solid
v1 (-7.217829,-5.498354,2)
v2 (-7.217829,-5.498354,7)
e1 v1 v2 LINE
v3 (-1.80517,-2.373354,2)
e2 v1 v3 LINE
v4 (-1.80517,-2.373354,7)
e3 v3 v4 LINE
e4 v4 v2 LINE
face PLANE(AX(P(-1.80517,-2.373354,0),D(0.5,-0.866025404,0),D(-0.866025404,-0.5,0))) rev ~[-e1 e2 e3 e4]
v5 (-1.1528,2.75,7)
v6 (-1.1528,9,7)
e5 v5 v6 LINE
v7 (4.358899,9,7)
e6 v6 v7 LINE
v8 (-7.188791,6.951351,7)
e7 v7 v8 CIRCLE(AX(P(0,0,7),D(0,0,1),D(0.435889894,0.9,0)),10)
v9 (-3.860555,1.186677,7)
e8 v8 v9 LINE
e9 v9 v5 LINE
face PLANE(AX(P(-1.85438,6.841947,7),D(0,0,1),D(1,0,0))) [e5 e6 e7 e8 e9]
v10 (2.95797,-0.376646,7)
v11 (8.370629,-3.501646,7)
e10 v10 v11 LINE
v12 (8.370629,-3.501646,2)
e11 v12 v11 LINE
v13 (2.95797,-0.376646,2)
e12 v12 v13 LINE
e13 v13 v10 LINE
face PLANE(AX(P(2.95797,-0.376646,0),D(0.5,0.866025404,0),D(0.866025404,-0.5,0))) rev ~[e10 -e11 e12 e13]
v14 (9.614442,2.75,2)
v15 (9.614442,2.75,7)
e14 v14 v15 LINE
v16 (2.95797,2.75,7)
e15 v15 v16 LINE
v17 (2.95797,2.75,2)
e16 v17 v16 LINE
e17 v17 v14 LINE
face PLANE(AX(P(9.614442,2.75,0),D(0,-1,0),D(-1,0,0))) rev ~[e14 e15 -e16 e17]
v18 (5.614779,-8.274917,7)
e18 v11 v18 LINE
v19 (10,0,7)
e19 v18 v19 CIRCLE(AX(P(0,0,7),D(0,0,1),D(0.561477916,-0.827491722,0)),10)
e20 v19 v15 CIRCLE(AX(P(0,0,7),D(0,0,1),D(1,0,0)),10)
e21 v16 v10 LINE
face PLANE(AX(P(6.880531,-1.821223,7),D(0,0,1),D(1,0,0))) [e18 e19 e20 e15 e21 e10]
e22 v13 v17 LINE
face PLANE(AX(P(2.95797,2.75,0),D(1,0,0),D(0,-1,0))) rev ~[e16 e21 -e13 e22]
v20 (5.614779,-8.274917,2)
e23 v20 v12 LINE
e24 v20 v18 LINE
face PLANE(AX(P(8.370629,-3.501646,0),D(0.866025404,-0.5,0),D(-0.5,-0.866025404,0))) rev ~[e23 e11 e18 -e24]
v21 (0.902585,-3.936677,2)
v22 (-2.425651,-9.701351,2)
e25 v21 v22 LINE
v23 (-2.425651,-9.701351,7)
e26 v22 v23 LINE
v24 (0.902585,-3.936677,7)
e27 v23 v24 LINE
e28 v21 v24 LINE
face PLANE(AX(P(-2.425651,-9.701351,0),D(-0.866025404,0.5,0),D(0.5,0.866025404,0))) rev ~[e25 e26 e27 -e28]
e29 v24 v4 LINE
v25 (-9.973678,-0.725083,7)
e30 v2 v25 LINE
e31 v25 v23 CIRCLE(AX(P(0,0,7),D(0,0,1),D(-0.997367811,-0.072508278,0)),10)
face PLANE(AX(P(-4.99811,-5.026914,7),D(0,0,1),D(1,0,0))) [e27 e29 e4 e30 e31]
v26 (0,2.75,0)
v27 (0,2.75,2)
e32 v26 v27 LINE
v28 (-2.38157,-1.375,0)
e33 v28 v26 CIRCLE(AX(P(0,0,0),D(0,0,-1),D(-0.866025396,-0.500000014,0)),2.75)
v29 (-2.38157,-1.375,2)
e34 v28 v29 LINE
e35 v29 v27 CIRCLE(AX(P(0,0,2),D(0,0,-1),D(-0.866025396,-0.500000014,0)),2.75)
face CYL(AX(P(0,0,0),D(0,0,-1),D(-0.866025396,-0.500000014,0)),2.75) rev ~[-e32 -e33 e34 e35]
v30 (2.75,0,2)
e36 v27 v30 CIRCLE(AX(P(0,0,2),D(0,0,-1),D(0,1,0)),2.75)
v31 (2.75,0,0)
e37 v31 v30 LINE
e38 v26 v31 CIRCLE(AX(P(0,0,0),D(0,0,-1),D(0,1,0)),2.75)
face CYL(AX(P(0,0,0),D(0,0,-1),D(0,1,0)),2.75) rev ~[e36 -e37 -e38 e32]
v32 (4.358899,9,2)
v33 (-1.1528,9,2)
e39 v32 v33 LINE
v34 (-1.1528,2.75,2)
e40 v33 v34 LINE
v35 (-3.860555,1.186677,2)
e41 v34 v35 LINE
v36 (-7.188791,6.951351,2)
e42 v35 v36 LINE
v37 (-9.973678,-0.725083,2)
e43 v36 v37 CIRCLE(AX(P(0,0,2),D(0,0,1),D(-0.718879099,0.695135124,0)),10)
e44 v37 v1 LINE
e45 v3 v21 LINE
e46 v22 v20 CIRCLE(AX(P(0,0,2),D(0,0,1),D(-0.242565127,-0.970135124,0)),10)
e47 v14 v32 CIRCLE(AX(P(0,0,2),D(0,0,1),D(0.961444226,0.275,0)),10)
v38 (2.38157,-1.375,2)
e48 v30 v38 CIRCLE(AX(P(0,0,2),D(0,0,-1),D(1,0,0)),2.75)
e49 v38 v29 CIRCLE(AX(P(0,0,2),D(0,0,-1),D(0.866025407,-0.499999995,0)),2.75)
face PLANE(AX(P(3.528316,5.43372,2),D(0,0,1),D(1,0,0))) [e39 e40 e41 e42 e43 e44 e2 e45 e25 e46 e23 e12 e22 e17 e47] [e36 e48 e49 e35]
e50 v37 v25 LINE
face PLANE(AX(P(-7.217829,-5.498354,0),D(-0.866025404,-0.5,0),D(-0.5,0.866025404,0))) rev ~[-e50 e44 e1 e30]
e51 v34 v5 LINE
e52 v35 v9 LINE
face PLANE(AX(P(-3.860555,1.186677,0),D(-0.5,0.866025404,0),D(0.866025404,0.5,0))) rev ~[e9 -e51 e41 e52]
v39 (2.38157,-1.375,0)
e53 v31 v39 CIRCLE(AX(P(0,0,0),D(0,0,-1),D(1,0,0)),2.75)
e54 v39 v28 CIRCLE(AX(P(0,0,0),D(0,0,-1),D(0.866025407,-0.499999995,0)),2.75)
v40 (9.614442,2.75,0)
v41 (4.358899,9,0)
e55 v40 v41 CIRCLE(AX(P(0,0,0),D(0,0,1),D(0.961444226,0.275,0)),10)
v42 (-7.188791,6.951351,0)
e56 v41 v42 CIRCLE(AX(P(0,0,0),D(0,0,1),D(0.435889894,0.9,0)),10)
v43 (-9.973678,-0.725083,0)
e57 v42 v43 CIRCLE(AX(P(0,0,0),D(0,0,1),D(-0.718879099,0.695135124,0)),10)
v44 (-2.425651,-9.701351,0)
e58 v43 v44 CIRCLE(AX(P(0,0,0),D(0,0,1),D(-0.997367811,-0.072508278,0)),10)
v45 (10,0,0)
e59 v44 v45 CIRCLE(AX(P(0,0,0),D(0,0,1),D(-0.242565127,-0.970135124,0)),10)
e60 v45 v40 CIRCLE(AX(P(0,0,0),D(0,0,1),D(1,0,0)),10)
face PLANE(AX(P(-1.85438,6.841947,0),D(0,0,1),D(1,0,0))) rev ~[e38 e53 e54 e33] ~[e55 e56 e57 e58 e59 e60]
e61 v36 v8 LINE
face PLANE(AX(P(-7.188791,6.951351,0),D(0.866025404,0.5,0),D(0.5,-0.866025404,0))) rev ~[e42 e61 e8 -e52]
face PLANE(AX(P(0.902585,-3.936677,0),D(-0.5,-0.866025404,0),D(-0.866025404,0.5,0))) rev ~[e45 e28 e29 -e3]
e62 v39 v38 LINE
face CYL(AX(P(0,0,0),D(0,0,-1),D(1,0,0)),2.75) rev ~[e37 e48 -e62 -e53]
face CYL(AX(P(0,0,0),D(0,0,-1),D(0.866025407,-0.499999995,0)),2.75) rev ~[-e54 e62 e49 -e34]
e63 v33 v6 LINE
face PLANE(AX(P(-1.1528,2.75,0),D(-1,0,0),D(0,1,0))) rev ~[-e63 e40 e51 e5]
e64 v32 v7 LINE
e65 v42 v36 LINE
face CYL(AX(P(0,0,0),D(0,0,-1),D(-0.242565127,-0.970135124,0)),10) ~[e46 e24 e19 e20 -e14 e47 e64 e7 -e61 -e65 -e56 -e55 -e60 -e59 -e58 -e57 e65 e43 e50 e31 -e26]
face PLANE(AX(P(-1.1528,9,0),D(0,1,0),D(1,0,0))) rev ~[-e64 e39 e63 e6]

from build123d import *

# Parameters (mm, degrees)
F1_DEPTH = 2
F2_DEPTH = 7


# Not quite as in the source:
# - a feature names something its author has since deleted; it is built from what else it names


with BuildPart() as f1:
    # F0 (on Top) → F1 (new body)
    with BuildSketch(Plane.XY):
        with BuildLine():
            Line((2.9579698818, 2.75), (9.6144422615, 2.75))
            ThreePointArc((9.6144422615, 2.75), (7.6537044043, 6.4359000064), (4.3588989435, 9))
            Line((4.3588989435, 9), (-1.1528000428, 9))
            Line((-1.1528000428, 9), (-1.1528000428, 2.75))
            Line((-1.1528000428, 2.75), (0, 2.75))
            Line((0, 2.75), (2.9579698818, 2.75))
        make_face()
        with BuildLine():
            ThreePointArc((-2.4256512704, -9.7013512417), (1.7468006996, -9.8462524503), (5.6147791623, -8.2749172176))
            Line((5.6147791623, -8.2749172176), (8.3706286555, -3.5016458774))
            Line((8.3706286555, -3.5016458774), (2.9579698818, -0.3766458774))
            Line((2.9579698818, -0.3766458774), (2.3815698685, -1.3749999859))
            Line((2.3815698685, -1.3749999859), (0.9025849195, -3.9366770613))
            Line((0.9025849195, -3.9366770613), (-2.4256512704, -9.7013512417))
        make_face()
        with BuildLine():
            Line((2.9579698818, -0.3766458774), (2.9579698818, 2.75))
            Line((2.9579698818, 2.75), (0, 2.75))
            ThreePointArc((0, 2.75), (1.9445436483, 1.9445436483), (2.75, 0))
            ThreePointArc((2.75, 0), (2.6562960244, -0.7117523662), (2.3815698685, -1.3749999859))
            Line((2.3815698685, -1.3749999859), (2.9579698818, -0.3766458774))
        make_face()
        with BuildLine():
            Line((-3.8605548013, 1.1866770613), (-7.1887909912, 6.9513512417))
            ThreePointArc((-7.1887909912, 6.9513512417), (-9.4005051039, 3.410352444), (-9.9736781058, -0.7250827824))
            Line((-9.9736781058, -0.7250827824), (-7.2178286127, -5.4983541226))
            Line((-7.2178286127, -5.4983541226), (-1.805169839, -2.3733541226))
            Line((-1.805169839, -2.3733541226), (-2.3815698389, -1.3750000373))
            Line((-2.3815698389, -1.3750000373), (-3.8605548013, 1.1866770613))
        make_face()
        with BuildLine():
            ThreePointArc((-2.3815698389, -1.3750000373), (-2.3815698712, 1.3749999814), (0, 2.75))
            Line((0, 2.75), (-1.1528000428, 2.75))
            Line((-1.1528000428, 2.75), (-3.8605548013, 1.1866770613))
            Line((-3.8605548013, 1.1866770613), (-2.3815698389, -1.3750000373))
        make_face()
        with BuildLine():
            Line((-1.805169839, -2.3733541226), (0.9025849195, -3.9366770613))
            Line((0.9025849195, -3.9366770613), (2.3815698685, -1.3749999859))
            ThreePointArc((2.3815698685, -1.3749999859), (2.97e-08, -2.75), (-2.3815698389, -1.3750000373))
            Line((-2.3815698389, -1.3750000373), (-1.805169839, -2.3733541226))
        make_face()
    extrude(amount=F1_DEPTH)

    # F0 (on Top) → F2 (join)
    with BuildSketch(Plane.XY):
        with BuildLine():
            Line((-1.1528000428, 9), (4.3588989435, 9))
            ThreePointArc((4.3588989435, 9), (-1.7468006996, 9.8462524503), (-7.1887909912, 6.9513512417))
            Line((-7.1887909912, 6.9513512417), (-3.8605548013, 1.1866770613))
            Line((-3.8605548013, 1.1866770613), (-1.1528000428, 2.75))
            Line((-1.1528000428, 2.75), (-1.1528000428, 9))
        make_face()
        with BuildLine():
            ThreePointArc((5.6147791623, -8.2749172176), (8.8359434025, -4.6825318139), (10, 0))
            ThreePointArc((10, 0), (9.9031414868, 1.3884483038), (9.6144422615, 2.75))
            Line((9.6144422615, 2.75), (2.9579698818, 2.75))
            Line((2.9579698818, 2.75), (2.9579698818, -0.3766458774))
            Line((2.9579698818, -0.3766458774), (8.3706286555, -3.5016458774))
            Line((8.3706286555, -3.5016458774), (5.6147791623, -8.2749172176))
        make_face()
        with BuildLine():
            ThreePointArc((-9.9736781058, -0.7250827824), (-7.6537044043, -6.4359000064), (-2.4256512704, -9.7013512417))
            Line((-2.4256512704, -9.7013512417), (0.9025849195, -3.9366770613))
            Line((0.9025849195, -3.9366770613), (-1.805169839, -2.3733541226))
            Line((-1.805169839, -2.3733541226), (-7.2178286127, -5.4983541226))
            Line((-7.2178286127, -5.4983541226), (-9.9736781058, -0.7250827824))
        make_face()
    extrude(amount=F2_DEPTH)


solid = f1.part
